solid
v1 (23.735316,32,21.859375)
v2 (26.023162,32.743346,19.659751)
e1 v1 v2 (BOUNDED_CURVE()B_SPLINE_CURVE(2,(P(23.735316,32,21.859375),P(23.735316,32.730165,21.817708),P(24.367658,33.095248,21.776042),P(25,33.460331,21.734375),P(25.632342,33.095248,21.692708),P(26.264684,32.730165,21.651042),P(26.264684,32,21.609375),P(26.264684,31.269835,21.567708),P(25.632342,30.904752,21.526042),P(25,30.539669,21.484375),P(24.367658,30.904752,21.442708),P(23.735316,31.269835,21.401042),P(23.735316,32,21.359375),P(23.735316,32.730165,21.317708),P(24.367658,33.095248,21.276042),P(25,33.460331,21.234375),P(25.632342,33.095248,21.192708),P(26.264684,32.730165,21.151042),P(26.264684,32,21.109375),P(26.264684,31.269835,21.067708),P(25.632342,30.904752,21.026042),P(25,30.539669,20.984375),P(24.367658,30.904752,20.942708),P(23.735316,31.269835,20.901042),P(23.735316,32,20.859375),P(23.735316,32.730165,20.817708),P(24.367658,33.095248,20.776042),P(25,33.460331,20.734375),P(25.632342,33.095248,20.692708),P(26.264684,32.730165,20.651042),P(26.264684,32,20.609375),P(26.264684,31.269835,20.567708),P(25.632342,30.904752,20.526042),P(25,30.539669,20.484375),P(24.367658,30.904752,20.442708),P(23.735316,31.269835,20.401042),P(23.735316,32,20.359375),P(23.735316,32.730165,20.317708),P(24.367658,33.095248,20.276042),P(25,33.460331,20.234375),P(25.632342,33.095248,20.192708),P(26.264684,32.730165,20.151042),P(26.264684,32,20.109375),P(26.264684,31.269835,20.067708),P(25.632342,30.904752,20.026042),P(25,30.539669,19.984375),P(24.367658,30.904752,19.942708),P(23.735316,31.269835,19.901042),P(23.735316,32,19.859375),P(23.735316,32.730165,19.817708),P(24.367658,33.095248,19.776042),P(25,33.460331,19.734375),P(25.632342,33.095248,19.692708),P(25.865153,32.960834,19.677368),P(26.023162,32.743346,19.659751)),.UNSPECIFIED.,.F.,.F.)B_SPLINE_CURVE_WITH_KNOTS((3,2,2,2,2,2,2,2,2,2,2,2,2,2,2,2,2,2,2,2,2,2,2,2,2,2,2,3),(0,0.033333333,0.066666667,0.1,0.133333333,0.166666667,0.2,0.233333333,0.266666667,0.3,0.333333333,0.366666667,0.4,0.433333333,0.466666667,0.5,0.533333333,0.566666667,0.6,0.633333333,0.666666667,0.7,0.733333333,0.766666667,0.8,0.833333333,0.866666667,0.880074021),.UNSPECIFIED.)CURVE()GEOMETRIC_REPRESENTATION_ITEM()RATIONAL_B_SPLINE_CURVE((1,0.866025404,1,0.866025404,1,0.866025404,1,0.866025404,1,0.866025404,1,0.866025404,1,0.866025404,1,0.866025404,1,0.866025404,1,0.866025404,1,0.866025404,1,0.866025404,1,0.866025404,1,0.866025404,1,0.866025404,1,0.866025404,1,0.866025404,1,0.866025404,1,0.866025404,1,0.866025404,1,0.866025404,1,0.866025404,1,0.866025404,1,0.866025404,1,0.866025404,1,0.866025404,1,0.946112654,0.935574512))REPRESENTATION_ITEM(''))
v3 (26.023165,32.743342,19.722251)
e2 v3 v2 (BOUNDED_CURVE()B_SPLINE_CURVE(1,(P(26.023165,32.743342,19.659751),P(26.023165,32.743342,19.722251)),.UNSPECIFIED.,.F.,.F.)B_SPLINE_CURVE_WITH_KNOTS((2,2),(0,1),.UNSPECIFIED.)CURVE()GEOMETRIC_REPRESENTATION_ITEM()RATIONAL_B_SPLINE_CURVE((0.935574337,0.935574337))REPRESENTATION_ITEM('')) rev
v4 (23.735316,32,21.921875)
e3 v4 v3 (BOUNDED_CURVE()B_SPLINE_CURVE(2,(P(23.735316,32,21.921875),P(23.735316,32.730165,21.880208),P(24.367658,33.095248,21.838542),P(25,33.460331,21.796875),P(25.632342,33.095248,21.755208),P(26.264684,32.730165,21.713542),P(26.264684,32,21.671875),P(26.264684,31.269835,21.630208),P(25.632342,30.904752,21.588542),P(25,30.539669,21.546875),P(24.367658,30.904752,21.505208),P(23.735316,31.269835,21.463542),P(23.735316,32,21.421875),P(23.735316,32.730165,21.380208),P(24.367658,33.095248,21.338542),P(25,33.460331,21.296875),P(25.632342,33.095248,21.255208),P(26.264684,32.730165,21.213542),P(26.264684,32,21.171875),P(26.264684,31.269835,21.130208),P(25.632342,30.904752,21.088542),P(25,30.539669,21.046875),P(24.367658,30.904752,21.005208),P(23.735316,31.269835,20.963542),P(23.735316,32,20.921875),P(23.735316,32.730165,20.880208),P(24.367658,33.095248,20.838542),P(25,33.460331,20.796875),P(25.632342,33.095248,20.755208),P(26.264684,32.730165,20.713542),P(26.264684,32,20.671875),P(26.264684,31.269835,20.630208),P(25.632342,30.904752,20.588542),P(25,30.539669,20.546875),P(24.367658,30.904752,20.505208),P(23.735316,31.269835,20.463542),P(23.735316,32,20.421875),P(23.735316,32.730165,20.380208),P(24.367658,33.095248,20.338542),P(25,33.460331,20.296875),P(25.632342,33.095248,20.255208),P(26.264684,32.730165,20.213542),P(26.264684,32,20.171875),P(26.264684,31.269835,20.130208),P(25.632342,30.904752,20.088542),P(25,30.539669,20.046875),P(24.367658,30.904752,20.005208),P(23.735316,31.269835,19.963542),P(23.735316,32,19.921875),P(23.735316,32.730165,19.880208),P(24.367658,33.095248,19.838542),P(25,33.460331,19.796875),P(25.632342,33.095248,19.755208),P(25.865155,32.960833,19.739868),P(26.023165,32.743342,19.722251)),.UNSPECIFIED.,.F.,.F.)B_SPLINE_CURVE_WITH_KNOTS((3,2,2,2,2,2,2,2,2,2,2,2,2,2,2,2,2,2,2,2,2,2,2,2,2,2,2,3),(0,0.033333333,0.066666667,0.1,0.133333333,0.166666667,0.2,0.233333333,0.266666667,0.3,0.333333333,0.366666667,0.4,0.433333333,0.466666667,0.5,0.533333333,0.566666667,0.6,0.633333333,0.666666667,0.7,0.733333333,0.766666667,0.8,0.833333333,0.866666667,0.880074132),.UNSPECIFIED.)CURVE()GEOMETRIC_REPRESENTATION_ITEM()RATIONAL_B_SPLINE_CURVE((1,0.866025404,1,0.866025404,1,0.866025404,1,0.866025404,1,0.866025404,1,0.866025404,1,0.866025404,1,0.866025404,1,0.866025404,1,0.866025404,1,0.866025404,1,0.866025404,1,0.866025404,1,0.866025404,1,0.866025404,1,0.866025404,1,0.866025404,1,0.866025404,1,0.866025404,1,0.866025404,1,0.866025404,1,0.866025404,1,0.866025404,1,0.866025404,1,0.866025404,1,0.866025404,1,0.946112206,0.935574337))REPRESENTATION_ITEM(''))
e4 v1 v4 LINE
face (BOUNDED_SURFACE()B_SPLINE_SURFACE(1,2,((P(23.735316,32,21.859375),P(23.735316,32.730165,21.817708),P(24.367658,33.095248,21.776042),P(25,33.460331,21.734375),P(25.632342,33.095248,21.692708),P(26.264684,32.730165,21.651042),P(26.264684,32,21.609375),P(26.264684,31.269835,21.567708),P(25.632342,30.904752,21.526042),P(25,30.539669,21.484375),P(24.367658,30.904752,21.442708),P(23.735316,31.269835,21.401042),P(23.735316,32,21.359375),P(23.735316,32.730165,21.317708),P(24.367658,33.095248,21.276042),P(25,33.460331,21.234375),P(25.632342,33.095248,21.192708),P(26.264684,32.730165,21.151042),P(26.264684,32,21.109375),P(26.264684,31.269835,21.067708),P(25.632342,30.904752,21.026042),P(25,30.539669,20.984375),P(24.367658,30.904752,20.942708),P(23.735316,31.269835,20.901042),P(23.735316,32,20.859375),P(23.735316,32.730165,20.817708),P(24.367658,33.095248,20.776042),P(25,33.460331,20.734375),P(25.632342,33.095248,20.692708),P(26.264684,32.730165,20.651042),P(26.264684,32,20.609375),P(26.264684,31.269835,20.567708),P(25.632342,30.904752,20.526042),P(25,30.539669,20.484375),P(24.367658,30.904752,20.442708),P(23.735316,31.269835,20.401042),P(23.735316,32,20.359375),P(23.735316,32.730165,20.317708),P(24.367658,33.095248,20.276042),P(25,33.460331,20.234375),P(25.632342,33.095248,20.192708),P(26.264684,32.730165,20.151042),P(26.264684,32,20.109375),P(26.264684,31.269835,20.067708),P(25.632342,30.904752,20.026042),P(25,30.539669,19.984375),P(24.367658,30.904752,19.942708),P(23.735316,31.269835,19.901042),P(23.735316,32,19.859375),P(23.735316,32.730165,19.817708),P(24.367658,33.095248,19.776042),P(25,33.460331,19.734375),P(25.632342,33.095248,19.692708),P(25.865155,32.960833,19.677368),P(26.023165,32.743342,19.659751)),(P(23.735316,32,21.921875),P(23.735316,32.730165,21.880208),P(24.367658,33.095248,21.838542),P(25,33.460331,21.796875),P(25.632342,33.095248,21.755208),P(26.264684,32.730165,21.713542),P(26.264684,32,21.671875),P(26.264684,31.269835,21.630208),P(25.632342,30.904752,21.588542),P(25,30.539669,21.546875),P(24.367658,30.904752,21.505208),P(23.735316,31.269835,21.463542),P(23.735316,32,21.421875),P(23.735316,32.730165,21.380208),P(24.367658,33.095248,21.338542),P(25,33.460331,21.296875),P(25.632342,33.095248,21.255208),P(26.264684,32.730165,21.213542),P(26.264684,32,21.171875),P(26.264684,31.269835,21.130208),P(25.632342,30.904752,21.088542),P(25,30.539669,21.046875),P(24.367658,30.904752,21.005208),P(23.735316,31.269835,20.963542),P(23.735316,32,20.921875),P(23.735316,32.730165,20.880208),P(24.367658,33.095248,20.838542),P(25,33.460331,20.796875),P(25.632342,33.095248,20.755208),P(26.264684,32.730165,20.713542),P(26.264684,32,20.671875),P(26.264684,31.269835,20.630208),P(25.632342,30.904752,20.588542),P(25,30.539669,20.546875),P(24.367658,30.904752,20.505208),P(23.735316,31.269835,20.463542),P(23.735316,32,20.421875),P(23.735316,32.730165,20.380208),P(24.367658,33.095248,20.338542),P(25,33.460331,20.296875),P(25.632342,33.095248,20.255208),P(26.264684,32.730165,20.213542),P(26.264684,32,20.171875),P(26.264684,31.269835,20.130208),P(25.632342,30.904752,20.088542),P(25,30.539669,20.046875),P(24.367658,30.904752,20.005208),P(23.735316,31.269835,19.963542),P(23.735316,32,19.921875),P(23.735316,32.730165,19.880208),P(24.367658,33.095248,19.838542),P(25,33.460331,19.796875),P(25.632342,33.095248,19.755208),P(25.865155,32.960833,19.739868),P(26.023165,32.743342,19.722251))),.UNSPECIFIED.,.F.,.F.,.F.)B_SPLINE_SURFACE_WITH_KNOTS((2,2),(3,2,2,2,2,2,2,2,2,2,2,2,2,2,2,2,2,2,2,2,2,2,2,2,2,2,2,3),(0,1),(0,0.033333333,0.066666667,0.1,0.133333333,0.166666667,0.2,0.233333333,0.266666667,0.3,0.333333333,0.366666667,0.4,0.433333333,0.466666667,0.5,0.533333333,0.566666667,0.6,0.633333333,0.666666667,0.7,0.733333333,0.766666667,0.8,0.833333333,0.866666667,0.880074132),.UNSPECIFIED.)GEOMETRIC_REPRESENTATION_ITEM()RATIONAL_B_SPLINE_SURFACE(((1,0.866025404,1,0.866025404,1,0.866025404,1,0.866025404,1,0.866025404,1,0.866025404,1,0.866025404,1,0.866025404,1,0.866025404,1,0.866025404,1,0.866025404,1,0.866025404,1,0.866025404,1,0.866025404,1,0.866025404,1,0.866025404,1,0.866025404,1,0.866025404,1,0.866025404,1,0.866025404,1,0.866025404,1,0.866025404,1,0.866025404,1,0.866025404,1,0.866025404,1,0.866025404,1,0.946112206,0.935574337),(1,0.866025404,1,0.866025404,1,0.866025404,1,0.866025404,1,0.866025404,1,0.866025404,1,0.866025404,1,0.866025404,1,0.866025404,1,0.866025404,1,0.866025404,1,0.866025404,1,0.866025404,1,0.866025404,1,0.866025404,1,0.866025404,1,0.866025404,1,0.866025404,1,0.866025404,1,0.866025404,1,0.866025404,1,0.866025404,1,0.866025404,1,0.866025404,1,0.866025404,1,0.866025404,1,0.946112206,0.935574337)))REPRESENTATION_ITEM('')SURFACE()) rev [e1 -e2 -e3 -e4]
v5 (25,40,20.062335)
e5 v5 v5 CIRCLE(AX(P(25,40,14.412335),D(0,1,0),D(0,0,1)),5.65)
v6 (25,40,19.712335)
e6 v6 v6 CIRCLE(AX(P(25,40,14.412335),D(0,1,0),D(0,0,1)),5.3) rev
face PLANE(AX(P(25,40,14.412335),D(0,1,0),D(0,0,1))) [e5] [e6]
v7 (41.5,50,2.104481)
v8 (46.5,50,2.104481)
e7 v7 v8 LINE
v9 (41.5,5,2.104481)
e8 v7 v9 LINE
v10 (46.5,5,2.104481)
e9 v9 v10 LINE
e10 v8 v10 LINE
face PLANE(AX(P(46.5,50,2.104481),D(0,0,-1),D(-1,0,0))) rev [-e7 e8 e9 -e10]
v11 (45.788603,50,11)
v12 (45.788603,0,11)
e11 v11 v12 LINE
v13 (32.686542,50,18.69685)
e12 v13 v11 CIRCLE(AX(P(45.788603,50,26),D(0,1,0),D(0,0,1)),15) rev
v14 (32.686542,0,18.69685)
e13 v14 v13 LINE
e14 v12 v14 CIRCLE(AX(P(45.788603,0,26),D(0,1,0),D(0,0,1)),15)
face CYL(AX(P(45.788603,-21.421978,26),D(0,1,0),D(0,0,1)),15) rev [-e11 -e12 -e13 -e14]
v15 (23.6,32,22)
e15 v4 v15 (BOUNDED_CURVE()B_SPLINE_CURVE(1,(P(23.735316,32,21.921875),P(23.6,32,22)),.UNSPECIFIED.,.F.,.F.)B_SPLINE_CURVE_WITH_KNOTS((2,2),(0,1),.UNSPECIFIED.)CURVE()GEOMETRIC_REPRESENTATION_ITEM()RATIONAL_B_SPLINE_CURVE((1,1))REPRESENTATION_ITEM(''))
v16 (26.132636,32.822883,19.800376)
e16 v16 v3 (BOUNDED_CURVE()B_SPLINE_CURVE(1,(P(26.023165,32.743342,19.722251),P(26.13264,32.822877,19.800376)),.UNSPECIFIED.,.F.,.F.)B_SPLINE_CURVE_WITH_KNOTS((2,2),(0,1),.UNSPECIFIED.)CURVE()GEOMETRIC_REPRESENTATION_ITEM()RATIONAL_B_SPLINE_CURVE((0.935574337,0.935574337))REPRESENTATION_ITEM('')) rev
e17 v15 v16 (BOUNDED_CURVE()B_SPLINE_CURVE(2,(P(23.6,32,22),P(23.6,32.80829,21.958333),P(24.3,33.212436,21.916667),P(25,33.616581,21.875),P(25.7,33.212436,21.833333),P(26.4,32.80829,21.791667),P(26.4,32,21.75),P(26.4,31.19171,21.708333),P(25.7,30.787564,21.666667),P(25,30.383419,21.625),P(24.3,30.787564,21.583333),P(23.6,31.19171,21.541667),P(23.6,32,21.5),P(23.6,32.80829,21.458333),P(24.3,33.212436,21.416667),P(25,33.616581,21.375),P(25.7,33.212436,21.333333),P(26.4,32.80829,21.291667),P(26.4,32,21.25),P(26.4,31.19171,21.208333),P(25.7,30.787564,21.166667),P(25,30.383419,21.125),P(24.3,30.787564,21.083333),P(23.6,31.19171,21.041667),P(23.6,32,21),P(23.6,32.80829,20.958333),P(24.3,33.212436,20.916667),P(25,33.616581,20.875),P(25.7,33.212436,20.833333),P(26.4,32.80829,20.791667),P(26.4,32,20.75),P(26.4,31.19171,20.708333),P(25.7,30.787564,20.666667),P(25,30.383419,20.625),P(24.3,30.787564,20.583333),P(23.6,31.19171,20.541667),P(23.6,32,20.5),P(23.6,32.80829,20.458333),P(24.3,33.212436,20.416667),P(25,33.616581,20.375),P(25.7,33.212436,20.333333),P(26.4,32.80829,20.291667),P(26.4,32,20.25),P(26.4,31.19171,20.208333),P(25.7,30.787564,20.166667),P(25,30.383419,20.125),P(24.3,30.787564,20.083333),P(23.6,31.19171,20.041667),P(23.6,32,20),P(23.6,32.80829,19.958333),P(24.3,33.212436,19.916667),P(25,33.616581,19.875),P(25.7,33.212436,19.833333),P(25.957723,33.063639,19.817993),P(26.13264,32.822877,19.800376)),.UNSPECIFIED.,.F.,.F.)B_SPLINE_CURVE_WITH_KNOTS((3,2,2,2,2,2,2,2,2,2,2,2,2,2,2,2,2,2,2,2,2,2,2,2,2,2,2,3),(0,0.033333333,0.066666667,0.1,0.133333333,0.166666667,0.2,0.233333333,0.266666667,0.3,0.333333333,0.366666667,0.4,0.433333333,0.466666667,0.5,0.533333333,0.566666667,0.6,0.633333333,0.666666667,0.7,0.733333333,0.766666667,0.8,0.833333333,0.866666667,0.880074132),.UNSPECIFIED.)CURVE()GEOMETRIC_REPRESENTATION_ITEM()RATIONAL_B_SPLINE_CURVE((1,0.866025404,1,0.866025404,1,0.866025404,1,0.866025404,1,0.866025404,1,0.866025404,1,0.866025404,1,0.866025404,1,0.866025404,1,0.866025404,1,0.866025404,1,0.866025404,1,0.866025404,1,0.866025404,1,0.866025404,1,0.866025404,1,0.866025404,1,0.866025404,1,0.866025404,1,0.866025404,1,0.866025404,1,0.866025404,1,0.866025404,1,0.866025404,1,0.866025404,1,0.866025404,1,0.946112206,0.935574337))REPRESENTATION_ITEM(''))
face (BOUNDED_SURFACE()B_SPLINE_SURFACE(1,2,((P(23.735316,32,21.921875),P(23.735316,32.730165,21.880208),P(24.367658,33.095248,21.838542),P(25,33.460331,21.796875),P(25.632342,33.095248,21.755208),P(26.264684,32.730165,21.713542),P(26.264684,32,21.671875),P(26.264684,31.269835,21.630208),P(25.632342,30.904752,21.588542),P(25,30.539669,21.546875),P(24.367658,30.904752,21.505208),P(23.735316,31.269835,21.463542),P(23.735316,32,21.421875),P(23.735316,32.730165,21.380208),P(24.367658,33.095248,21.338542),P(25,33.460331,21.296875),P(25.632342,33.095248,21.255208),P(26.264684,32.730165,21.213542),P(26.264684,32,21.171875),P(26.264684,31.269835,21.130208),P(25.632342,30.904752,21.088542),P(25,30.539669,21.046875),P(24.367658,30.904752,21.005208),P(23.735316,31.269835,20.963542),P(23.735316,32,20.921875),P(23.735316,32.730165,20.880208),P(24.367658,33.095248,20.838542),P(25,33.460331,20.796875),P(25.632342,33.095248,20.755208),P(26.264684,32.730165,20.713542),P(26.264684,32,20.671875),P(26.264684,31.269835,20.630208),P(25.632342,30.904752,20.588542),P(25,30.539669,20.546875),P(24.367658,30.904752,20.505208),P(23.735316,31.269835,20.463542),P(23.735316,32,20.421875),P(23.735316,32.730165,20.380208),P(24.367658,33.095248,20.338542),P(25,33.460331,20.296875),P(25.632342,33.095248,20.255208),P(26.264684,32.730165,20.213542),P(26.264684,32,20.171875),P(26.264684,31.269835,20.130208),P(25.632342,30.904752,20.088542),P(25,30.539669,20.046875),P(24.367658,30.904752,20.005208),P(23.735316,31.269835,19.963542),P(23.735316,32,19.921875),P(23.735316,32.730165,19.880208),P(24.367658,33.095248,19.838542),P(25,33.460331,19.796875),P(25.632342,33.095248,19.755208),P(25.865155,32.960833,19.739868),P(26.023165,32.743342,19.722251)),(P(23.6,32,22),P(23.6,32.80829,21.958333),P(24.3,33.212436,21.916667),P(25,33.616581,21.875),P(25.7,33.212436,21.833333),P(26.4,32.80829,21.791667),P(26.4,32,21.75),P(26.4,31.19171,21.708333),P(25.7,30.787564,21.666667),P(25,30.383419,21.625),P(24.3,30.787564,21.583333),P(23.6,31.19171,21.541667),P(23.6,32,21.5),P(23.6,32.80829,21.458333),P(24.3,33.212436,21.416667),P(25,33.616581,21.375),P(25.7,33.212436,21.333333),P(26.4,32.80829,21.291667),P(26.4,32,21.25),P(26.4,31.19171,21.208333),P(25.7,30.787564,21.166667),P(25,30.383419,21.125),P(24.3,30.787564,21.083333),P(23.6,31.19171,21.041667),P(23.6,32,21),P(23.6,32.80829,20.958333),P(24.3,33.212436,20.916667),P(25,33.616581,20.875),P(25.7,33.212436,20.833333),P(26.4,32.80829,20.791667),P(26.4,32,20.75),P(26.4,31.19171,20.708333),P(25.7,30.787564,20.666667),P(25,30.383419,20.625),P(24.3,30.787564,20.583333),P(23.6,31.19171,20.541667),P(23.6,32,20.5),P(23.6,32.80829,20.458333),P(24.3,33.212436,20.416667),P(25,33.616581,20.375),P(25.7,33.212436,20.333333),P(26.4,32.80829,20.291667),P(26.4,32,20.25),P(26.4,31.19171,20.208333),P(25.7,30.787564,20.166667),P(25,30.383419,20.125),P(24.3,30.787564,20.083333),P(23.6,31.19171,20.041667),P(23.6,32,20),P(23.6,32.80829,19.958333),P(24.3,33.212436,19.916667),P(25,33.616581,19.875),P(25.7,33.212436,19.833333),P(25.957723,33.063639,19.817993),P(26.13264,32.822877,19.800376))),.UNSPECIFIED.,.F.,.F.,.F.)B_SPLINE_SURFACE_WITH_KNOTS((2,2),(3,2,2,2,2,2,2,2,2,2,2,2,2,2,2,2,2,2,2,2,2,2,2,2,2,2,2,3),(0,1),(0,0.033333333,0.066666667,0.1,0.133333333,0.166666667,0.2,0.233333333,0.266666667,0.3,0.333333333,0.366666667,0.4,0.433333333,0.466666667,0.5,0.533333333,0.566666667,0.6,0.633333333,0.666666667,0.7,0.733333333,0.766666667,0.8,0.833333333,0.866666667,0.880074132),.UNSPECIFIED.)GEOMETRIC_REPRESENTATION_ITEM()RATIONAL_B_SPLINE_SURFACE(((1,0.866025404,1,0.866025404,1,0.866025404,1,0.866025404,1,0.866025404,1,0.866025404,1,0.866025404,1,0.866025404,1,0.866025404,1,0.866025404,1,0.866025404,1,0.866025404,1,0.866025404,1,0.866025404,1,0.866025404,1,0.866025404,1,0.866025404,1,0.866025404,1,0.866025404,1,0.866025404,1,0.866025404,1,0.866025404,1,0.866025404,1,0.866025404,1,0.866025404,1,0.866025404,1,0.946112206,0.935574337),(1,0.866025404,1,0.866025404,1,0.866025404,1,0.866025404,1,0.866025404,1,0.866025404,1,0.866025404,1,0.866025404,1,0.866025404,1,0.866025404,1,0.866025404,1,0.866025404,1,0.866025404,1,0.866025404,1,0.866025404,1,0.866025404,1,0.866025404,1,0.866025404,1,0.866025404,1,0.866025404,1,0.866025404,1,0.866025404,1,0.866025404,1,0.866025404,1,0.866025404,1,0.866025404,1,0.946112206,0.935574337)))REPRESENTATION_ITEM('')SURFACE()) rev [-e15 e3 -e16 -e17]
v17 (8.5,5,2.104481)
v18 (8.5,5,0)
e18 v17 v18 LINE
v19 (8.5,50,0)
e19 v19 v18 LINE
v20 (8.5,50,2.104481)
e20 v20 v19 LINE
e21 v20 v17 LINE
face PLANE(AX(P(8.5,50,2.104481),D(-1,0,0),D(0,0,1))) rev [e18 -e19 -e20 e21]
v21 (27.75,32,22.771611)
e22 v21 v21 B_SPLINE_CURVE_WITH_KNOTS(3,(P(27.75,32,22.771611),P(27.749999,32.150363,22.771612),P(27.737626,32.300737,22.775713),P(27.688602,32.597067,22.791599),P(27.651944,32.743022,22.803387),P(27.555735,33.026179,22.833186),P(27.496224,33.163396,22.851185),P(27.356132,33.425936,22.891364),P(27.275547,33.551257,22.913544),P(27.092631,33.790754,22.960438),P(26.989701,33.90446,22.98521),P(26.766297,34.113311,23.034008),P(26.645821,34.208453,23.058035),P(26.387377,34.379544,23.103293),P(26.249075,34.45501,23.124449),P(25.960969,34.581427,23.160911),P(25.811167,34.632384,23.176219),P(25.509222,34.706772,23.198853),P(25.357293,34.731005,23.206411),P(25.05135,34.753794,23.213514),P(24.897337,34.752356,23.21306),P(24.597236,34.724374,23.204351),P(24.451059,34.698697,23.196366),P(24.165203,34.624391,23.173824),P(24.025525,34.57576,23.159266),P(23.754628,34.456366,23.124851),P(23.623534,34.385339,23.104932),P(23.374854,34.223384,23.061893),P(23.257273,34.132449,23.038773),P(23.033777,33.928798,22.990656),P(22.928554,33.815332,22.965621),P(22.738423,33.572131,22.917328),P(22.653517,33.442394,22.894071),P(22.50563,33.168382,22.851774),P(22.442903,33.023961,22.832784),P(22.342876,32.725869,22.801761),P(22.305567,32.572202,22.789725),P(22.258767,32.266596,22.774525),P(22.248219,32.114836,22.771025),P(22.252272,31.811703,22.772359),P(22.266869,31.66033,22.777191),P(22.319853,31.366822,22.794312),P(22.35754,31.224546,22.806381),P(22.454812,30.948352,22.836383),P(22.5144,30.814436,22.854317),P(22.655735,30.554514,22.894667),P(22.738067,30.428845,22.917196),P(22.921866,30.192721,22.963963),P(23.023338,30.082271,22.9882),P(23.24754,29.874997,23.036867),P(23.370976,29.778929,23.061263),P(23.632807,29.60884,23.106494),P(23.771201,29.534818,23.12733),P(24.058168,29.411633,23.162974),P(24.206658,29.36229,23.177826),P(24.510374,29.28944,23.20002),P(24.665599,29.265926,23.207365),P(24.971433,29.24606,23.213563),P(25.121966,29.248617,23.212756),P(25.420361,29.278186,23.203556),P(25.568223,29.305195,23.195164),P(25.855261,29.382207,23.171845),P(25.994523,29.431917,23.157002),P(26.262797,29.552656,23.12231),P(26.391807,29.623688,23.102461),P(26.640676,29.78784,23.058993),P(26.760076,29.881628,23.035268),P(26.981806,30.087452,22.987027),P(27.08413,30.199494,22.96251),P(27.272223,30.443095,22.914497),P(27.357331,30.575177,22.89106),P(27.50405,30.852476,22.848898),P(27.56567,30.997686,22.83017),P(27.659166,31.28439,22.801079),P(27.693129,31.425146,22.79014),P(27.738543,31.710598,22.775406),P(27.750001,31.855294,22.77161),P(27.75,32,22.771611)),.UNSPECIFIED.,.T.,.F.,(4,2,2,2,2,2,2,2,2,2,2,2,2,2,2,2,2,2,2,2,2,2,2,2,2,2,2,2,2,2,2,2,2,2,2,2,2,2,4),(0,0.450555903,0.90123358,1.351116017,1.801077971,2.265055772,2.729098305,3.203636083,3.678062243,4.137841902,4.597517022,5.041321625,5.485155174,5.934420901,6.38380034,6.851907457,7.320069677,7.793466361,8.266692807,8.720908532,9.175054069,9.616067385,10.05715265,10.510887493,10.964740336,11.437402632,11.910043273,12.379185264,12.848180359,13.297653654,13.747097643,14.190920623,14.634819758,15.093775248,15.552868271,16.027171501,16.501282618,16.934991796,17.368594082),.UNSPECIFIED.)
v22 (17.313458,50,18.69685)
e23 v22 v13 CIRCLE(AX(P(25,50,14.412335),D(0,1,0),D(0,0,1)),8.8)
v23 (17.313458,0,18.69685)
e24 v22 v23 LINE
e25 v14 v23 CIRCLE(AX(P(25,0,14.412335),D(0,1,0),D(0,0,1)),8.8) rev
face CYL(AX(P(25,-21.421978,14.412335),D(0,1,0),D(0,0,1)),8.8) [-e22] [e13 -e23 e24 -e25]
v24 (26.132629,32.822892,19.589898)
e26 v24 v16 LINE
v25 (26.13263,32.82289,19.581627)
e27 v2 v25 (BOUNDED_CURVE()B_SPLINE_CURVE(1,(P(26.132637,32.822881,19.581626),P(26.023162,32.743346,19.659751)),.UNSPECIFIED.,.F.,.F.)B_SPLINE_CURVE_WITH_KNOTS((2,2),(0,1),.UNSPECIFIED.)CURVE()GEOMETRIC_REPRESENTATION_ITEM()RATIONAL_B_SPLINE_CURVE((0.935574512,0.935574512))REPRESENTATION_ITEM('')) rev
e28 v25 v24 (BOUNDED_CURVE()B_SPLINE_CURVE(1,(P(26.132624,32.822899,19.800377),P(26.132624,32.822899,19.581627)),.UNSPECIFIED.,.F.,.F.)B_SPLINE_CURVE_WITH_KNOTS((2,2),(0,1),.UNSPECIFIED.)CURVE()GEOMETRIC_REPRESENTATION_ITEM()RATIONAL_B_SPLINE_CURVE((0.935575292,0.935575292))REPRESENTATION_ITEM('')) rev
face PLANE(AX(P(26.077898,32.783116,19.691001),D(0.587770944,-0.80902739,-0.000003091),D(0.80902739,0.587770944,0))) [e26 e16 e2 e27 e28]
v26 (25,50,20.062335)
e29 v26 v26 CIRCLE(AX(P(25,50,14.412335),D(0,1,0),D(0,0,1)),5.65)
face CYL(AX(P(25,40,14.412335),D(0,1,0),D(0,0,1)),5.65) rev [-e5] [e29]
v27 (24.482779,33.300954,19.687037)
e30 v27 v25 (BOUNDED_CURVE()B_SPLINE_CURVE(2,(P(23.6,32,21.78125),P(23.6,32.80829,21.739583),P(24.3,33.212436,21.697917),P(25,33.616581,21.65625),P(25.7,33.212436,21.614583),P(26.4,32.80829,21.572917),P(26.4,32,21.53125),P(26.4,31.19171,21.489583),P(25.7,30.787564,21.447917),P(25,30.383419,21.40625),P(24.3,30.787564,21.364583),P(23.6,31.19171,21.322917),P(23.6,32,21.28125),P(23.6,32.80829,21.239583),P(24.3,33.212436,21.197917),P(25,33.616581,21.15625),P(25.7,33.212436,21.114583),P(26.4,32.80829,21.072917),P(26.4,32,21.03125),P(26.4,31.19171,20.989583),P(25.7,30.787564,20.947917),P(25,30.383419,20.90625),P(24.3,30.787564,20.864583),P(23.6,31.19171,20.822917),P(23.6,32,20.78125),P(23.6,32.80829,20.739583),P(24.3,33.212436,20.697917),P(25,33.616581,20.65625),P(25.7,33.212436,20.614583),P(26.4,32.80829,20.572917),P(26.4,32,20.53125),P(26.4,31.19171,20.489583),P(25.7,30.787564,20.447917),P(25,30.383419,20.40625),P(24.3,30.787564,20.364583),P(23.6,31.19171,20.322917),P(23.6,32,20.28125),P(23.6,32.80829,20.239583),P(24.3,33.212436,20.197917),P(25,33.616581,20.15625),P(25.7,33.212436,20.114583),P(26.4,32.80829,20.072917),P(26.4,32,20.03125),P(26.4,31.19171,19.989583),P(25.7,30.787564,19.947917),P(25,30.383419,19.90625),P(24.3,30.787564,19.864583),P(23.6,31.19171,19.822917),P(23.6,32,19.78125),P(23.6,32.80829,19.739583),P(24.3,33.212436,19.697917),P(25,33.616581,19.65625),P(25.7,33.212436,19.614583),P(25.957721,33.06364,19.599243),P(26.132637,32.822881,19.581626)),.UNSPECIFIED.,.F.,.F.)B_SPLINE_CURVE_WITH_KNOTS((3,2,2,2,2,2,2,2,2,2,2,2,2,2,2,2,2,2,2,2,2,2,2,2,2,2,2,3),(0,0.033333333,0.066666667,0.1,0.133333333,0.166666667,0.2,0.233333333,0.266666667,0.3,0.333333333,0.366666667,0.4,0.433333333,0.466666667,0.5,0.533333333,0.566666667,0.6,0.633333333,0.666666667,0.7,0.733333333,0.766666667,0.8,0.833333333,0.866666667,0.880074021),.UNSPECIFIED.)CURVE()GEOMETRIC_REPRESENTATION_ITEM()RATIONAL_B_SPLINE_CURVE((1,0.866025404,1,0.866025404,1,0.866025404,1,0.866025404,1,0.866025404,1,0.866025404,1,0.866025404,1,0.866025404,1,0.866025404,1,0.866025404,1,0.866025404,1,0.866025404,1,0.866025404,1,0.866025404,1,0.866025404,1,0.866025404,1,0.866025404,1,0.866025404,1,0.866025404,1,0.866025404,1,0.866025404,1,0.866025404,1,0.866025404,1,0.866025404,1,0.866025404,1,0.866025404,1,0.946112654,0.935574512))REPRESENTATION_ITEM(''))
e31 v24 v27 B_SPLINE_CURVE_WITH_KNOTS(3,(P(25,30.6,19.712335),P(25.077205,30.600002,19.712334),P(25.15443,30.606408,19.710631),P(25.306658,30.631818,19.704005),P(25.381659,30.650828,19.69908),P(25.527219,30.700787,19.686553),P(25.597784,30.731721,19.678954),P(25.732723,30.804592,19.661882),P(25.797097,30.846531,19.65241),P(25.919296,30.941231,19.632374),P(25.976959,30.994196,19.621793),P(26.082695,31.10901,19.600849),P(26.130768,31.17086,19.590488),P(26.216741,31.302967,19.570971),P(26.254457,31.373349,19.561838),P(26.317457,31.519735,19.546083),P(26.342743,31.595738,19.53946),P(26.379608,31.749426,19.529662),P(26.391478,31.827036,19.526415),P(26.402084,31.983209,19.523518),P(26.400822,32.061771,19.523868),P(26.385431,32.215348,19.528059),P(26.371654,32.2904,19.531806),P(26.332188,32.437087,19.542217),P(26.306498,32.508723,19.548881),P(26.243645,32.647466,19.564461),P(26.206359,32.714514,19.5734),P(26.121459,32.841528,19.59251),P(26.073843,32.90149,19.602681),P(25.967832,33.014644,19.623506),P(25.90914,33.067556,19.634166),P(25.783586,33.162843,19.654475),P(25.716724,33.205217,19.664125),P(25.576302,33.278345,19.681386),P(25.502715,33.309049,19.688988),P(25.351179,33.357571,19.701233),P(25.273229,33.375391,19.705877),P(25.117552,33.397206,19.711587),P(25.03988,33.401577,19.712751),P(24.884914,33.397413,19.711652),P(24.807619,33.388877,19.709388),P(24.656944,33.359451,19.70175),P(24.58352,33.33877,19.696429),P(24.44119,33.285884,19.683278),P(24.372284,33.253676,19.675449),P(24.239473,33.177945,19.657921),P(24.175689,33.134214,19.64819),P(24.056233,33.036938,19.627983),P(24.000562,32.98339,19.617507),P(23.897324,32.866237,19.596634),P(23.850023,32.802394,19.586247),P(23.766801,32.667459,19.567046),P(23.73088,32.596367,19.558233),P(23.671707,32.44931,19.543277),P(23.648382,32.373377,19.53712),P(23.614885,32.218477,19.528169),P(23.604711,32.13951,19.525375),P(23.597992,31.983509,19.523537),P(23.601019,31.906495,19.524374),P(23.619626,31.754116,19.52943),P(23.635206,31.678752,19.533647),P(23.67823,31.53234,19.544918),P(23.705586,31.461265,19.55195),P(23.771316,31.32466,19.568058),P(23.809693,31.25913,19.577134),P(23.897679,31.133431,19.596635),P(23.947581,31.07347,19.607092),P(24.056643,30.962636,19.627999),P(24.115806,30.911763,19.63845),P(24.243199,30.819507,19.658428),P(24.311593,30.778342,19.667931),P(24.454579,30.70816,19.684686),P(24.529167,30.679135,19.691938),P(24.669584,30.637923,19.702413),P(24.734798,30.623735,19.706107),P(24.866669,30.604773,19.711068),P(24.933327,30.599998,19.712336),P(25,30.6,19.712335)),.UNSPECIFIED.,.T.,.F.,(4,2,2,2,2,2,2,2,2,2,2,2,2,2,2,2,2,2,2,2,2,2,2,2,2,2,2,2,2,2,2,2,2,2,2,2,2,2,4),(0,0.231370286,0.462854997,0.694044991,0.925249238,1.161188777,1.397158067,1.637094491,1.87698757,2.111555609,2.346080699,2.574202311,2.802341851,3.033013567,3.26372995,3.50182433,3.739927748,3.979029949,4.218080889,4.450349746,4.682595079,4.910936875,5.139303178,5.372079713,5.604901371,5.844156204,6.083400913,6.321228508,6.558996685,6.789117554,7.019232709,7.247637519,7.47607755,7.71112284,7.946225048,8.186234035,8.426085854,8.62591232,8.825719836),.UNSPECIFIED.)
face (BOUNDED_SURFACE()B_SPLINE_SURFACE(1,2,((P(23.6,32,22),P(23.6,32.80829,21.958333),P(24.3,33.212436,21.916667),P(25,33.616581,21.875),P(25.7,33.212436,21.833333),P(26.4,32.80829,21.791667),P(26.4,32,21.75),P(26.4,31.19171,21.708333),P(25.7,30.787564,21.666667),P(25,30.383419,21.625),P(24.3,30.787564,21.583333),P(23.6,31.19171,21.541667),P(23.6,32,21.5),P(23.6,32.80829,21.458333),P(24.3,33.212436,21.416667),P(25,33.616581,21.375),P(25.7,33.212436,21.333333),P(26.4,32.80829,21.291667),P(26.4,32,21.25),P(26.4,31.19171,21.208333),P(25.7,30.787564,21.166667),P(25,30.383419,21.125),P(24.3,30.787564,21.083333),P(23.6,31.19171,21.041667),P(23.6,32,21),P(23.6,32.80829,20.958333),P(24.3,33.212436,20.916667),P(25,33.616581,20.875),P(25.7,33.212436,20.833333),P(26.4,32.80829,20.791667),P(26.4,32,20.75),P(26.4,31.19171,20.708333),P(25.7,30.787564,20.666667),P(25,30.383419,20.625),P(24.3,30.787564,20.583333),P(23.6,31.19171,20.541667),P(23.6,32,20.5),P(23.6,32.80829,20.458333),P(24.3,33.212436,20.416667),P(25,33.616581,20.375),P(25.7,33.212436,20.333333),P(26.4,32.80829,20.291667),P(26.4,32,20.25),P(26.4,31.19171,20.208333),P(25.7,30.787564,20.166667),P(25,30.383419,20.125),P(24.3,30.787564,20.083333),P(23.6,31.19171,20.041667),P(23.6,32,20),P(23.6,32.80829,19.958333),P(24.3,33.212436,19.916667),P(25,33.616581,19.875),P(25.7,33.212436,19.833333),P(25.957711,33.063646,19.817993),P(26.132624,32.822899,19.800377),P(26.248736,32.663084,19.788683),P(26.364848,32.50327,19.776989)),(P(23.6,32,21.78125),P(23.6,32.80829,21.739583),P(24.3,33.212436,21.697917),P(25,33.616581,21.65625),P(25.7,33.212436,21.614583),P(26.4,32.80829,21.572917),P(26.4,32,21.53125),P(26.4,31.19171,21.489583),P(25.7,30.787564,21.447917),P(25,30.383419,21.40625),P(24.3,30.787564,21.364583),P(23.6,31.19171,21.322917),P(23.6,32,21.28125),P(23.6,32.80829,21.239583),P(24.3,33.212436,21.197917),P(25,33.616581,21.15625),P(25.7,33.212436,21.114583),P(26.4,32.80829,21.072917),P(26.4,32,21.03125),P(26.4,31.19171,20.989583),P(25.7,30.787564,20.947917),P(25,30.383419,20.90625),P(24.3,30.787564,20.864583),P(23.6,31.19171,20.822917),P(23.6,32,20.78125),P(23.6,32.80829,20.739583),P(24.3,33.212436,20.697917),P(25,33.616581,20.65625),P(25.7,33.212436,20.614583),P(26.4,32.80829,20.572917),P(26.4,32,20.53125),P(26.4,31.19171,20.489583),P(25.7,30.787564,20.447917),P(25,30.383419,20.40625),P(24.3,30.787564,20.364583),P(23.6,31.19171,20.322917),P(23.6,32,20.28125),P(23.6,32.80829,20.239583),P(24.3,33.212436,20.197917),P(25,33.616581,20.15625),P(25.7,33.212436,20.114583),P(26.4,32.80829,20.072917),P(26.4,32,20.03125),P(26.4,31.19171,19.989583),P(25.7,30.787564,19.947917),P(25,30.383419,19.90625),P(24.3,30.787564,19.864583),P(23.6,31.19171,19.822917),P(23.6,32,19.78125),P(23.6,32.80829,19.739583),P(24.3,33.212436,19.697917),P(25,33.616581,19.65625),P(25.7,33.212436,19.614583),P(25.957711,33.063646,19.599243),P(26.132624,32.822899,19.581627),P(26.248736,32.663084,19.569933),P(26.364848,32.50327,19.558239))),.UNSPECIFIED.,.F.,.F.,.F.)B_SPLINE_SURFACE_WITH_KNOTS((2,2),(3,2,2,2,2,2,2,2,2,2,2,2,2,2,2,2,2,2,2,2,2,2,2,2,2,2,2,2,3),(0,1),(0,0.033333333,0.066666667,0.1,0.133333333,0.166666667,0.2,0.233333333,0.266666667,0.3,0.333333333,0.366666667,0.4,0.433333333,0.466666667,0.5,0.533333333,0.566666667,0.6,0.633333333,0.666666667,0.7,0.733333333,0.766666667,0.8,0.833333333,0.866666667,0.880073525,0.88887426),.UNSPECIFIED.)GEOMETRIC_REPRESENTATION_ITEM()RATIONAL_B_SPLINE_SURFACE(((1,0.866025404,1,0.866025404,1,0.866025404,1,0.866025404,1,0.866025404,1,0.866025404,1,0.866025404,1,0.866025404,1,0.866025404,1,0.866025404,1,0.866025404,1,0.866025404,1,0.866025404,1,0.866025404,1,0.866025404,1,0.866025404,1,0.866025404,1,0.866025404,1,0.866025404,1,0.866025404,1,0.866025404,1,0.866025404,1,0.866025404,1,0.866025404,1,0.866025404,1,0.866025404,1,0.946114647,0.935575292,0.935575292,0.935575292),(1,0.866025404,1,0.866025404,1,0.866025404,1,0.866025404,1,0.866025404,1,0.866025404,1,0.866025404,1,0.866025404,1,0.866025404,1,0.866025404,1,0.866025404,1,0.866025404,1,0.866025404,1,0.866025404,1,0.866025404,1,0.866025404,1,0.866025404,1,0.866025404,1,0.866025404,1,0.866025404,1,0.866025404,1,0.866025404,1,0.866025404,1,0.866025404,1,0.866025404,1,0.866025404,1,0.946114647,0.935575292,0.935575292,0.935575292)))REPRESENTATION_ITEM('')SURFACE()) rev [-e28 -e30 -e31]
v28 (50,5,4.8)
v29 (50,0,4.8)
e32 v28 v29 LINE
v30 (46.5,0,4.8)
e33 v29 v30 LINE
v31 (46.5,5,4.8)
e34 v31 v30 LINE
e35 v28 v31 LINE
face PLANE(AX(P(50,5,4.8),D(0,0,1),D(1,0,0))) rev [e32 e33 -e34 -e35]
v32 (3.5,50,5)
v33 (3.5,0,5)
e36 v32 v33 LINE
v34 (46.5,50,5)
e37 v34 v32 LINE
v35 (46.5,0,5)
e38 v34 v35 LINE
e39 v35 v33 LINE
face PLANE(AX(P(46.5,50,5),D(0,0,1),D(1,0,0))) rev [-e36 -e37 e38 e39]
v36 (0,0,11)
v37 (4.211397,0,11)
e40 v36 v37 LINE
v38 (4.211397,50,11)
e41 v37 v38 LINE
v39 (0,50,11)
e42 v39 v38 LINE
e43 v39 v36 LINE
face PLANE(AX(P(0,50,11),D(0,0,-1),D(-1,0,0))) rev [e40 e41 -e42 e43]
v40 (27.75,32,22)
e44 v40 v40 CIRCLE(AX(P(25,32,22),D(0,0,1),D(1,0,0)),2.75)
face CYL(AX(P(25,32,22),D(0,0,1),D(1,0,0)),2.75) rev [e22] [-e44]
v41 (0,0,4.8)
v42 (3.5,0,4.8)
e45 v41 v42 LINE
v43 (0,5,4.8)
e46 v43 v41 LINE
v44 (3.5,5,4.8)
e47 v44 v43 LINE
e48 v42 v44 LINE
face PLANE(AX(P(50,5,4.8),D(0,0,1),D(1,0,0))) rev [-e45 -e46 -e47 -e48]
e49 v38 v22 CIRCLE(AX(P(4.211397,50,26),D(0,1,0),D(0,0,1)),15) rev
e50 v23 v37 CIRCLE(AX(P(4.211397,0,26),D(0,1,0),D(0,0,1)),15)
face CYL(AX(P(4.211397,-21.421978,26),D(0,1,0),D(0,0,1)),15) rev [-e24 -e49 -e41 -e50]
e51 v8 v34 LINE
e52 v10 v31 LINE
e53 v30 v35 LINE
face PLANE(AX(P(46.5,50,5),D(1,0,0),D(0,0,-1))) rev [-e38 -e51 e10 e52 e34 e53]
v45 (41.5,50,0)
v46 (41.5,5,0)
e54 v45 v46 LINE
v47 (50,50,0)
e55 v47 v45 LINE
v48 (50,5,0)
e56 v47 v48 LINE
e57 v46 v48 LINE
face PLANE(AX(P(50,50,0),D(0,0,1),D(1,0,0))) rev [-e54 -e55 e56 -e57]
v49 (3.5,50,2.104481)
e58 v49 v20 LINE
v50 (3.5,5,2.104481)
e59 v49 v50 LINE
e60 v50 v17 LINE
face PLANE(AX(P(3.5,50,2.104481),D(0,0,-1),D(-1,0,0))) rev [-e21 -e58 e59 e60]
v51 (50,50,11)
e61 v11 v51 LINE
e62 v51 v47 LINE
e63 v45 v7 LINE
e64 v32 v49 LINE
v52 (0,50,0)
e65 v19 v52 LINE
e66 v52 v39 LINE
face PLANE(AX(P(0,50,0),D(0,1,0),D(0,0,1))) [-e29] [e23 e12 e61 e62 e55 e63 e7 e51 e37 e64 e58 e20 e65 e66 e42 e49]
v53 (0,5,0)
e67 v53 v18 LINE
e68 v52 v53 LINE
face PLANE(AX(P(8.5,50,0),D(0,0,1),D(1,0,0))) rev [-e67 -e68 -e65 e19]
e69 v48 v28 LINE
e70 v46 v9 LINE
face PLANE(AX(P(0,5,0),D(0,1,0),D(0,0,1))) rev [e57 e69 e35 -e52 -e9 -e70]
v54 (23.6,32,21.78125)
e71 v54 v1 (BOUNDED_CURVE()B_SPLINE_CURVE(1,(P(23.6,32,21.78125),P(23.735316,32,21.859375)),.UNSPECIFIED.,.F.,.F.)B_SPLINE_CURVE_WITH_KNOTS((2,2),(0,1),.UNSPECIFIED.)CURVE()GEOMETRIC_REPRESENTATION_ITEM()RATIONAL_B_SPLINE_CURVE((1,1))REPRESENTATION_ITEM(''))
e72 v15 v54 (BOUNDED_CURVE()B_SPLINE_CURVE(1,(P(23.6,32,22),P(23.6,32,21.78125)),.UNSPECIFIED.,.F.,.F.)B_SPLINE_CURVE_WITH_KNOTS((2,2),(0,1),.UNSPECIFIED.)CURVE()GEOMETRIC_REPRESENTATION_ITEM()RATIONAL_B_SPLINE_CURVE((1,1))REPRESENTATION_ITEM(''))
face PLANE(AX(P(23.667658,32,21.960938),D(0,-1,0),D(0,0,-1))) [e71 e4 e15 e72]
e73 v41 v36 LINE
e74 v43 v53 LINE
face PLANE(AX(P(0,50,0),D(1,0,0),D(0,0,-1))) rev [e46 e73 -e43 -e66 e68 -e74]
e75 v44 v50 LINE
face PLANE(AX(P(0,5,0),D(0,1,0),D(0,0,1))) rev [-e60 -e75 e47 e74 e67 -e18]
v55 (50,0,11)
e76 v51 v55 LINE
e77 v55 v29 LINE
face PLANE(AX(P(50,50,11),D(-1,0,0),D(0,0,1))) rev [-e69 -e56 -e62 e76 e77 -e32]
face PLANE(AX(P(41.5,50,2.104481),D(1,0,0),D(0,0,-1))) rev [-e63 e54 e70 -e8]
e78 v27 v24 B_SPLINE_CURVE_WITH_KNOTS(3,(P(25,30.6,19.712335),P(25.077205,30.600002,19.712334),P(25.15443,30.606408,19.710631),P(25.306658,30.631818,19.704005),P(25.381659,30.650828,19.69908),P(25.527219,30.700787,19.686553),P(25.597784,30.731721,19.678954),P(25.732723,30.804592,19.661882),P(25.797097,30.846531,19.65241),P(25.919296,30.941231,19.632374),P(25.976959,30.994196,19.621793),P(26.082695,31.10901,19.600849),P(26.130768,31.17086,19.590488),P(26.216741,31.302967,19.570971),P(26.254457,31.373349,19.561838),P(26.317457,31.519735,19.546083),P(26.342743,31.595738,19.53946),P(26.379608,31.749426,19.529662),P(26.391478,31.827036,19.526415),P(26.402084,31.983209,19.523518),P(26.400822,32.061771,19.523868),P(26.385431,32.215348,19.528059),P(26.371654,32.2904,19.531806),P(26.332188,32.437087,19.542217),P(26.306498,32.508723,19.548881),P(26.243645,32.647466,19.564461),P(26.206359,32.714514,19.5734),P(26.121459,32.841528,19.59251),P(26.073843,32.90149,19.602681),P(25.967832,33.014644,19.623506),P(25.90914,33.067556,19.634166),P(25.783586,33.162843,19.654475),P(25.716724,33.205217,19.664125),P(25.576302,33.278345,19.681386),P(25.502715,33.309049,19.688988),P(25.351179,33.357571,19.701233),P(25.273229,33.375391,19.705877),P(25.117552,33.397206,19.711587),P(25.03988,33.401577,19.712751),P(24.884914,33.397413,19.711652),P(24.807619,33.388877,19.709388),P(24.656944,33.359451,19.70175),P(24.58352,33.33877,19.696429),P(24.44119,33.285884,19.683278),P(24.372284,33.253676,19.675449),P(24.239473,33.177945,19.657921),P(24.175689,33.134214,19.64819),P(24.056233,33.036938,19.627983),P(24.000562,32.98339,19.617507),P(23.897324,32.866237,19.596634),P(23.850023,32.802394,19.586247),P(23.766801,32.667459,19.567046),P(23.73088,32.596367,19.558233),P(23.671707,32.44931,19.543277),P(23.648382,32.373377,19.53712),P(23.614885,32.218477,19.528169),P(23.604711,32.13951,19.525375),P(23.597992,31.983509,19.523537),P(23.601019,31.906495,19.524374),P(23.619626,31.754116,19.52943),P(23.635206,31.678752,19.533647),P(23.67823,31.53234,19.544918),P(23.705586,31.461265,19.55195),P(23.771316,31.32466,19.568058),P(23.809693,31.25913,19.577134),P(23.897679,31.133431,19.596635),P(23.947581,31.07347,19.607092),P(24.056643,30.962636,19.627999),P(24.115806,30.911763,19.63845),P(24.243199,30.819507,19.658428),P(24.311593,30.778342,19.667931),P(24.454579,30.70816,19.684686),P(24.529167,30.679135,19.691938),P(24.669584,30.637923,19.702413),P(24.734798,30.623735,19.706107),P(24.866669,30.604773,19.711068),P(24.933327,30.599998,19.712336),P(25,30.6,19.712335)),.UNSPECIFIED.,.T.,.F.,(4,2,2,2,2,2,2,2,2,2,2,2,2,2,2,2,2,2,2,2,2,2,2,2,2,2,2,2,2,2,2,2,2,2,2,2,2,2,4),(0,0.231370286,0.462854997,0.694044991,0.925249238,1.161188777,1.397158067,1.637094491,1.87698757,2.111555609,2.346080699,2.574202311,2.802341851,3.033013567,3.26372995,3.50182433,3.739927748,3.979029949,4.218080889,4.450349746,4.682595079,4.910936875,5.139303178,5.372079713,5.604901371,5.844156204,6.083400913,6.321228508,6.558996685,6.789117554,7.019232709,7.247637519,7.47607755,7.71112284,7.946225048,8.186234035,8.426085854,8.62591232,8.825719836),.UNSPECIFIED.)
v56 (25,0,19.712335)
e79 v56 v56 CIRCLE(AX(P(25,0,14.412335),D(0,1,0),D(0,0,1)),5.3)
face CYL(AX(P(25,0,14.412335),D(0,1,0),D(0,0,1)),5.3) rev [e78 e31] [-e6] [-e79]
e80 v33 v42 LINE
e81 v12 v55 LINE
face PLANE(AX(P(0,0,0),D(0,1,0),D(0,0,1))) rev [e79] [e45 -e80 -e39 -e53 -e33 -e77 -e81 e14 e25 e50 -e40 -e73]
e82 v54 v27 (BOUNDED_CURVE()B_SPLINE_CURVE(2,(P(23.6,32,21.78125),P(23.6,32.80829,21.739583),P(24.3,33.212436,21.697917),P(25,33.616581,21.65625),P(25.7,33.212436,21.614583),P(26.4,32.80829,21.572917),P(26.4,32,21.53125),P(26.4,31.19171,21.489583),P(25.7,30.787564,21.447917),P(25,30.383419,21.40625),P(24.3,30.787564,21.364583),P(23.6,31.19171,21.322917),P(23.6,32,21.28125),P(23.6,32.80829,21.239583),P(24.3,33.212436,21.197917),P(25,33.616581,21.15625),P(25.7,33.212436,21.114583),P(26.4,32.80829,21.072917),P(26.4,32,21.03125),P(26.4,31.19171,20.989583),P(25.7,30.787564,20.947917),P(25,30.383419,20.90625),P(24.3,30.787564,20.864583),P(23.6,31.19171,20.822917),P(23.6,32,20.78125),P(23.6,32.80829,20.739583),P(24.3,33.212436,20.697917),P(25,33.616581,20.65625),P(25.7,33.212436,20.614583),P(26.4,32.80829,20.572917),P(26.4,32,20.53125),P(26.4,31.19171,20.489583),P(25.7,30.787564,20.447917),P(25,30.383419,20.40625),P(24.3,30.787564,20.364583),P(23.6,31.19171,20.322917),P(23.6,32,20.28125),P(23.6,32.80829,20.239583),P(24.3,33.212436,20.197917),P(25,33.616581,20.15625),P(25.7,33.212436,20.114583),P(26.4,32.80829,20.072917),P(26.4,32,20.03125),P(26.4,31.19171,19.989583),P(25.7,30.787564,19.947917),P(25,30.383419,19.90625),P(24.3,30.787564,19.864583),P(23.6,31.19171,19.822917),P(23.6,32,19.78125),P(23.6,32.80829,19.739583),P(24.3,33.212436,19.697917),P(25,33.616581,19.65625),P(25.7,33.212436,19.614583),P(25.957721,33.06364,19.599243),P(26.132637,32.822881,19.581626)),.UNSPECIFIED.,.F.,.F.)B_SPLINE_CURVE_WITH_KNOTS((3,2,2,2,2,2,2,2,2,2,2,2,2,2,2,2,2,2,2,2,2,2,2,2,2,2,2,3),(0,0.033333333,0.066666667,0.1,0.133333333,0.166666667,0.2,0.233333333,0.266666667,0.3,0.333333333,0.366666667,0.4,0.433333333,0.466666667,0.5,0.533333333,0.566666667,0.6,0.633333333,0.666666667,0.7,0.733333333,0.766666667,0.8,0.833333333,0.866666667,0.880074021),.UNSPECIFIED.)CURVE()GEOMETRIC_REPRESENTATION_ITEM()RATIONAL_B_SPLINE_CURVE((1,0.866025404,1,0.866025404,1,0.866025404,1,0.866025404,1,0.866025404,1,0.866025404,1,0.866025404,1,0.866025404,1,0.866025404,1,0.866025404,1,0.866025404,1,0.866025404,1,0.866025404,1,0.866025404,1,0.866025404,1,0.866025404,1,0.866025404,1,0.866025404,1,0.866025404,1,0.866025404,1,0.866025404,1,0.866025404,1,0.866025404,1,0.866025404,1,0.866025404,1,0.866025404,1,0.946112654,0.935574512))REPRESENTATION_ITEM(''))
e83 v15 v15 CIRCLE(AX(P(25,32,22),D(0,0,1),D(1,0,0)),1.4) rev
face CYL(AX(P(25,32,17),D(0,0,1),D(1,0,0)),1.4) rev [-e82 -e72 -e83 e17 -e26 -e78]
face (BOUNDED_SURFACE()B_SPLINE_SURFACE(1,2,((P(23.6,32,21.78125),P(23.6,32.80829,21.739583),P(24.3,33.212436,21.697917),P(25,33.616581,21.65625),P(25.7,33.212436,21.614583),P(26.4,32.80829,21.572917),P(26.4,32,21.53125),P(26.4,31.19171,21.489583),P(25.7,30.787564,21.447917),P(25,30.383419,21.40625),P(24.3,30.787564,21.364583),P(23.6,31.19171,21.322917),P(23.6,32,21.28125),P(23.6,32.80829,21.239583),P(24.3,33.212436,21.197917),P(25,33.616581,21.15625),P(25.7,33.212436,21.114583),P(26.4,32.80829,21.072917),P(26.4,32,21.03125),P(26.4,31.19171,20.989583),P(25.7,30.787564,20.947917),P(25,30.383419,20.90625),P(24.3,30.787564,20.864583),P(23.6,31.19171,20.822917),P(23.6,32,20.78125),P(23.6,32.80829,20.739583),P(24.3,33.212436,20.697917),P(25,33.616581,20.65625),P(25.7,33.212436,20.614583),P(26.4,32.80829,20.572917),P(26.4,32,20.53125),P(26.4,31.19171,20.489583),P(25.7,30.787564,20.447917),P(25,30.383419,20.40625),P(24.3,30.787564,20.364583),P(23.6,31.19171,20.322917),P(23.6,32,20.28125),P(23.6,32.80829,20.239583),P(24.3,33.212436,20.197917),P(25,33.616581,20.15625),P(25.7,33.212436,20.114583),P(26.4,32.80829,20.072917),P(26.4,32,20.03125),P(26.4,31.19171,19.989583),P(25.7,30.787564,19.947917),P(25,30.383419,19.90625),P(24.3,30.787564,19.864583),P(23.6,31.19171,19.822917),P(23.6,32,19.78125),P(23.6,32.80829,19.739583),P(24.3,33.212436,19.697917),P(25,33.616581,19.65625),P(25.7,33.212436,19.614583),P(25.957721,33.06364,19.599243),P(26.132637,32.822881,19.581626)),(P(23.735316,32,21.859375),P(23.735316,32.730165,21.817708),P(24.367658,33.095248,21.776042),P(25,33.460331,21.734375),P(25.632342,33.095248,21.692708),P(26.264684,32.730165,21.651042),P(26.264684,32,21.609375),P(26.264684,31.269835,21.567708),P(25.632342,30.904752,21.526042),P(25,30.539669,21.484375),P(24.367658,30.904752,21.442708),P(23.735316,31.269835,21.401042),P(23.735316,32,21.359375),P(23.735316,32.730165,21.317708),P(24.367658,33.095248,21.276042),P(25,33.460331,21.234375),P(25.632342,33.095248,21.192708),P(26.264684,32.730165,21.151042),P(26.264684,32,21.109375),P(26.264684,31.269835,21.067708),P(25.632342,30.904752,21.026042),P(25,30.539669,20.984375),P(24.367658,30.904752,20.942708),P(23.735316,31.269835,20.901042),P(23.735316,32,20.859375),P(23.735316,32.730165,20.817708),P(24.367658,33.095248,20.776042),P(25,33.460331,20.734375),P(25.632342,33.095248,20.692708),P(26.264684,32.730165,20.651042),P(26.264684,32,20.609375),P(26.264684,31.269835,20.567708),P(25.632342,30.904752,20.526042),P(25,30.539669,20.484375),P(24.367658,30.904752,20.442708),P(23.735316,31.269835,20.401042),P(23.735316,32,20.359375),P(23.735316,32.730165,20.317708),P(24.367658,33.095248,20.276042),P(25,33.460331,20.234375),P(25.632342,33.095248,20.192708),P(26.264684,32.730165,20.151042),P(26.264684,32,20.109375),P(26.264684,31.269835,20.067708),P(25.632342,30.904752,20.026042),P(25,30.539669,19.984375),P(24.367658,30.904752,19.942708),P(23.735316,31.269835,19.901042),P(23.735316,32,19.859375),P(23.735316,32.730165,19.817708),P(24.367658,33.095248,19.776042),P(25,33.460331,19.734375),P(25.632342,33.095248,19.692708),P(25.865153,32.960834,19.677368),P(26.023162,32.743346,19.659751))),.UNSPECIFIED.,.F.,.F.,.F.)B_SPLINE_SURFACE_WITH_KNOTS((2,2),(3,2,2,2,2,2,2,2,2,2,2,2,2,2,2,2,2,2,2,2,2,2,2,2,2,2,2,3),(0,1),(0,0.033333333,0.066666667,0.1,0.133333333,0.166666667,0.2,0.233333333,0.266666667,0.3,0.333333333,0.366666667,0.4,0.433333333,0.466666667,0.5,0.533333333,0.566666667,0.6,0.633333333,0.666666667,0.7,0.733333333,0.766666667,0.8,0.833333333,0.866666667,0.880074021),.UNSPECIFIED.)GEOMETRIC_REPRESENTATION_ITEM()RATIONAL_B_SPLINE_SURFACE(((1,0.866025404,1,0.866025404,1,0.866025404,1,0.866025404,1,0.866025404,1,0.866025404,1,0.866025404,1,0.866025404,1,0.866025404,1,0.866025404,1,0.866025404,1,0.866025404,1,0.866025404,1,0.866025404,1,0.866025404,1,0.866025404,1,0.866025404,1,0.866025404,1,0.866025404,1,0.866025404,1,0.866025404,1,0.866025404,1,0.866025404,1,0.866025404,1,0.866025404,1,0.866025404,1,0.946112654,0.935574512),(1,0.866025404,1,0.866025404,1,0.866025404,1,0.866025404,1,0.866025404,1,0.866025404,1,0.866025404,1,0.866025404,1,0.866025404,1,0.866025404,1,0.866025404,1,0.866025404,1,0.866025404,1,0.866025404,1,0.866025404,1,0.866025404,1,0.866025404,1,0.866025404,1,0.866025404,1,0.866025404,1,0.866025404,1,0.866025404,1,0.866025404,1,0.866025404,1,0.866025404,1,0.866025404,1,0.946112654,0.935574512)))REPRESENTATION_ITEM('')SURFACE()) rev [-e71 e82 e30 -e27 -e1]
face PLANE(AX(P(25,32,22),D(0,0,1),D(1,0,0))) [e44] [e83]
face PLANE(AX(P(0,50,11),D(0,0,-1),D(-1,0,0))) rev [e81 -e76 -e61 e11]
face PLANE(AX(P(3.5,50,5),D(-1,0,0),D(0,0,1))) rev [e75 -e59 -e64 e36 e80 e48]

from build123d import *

# Parameters (mm, degrees)
BOSS_EXTRUDE1_DEPTH = 50
SKETCH2_W           = 50
SKETCH2_H           = 4.8
CUT_EXTRUDE1_DEPTH  = 5
SKETCH3_R           = 5.3
CUT_EXTRUDE2_DEPTH  = 72.561162651
BOSS_EXTRUDE2_DEPTH = 50
FILLET1_R           = 15
SKETCH6_R           = 1.4
CUT_EXTRUDE4_DEPTH  = 10
SKETCH7_R           = 2.75
CUT_EXTRUDE5_DEPTH  = 5
THREAD1_PITCH       = 0.5
SKETCH9_R           = 5.65
CUT_EXTRUDE6_DEPTH  = 10


with BuildPart() as part:
    # Sketch1 → Boss-Extrude1 (new body)
    with BuildSketch(Plane(origin=(0, 0, 0), x_dir=(1, 0, 0), z_dir=(0, 1, 0))):
        Polygon((8.5, 0), (0, 0), (0, -11), (50, -11), (50, 0), (41.5, 0), (41.5, -2.104480912), (46.5, -2.104480912), (46.5, -5), (3.5, -5), (3.5, -2.104480912), (8.5, -2.104480912), align=None)
    extrude(amount=BOSS_EXTRUDE1_DEPTH)

    # Sketch2 → Cut-Extrude1 (cut)
    with BuildSketch(Plane.XZ):
        with Locations((25, 2.4)):
            Rectangle(SKETCH2_W, SKETCH2_H)
    extrude(amount=-CUT_EXTRUDE1_DEPTH, mode=Mode.SUBTRACT)

    # Sketch3 → Cut-Extrude2 (cut, through all)
    with BuildSketch(Plane(origin=(0, 50, 0), x_dir=(1, 0, 0), z_dir=(0, 1, 0))):
        with Locations((25, -14.412334908)):
            Circle(SKETCH3_R)
    extrude(amount=-CUT_EXTRUDE2_DEPTH, mode=Mode.SUBTRACT)

    # Sketch5 → Boss-Extrude2 (add)
    with BuildSketch(Plane(origin=(0, 50, 0), x_dir=(1, 0, 0), z_dir=(0, 1, 0))):
        with BuildLine():
            Line((16.888528464, -11), (20.944636826, -11))
            ThreePointArc((20.944636826, -11), (25, -19.712334908), (29.055363174, -11))
            Line((29.055363174, -11), (33.111471536, -11))
            ThreePointArc((33.111471536, -11), (25, -23.212334908), (16.888528464, -11))
        make_face()
    extrude(amount=-BOSS_EXTRUDE2_DEPTH)

    # Fillet1
    fillet1_edges = [part.edges().sort_by_distance(p)[0] for p in [
        (33.111471536, 25, 11),
        (16.888528464, 25, 11),
    ]]
    fillet(fillet1_edges, radius=FILLET1_R)

    # Sketch6 → Cut-Extrude4 (cut)
    with BuildSketch(Plane.XY.offset(27)):
        with Locations((25, 32)):
            Circle(SKETCH6_R)
    extrude(amount=-CUT_EXTRUDE4_DEPTH, mode=Mode.SUBTRACT)

    # Sketch7 → Cut-Extrude5 (cut)
    with BuildSketch(Plane.XY.offset(27)):
        with Locations((25, 32)):
            Circle(SKETCH7_R)
    extrude(amount=-CUT_EXTRUDE5_DEPTH, mode=Mode.SUBTRACT)

    # Thread1: the profile of Thread Profile1 profile screwed along a right-hand helix of 4.4 turns, 6 arcs to a turn; built about Z, then put on its axis
    thread1_z = Axis((0, 0, 0), (0, 0, 1))
    thread1_corners = [(1.4003, 0, -0.000173205), (1.4003, 0, 0.218923204), (1.264683531, 0, 0.140625), (1.264683531, 0, 0.078125)]
    with BuildLine(mode=Mode.PRIVATE) as thread1_profile:
        Line(thread1_corners[0], thread1_corners[1])
        Line(thread1_corners[1], thread1_corners[2])
        Line(thread1_corners[2], thread1_corners[3])
        Line(thread1_corners[3], thread1_corners[0])
    thread1_cap = Face(thread1_profile.wire())
    thread1_turn_angles = [0, 30, 60, 90, 120, 150, 180, 210, 240, 270, 300, 330, 360]
    thread1_turn_weights = [1, 0.8660254037844387, 1, 0.8660254037844387, 1, 0.8660254037844387, 1, 0.8660254037844387, 1, 0.8660254037844387, 1, 0.8660254037844387, 1]
    thread1_turn_rails = [Edge.make_bspline([Vector(p[0], p[1], 0).rotate(thread1_z, thread1_turn_angles[k]) / thread1_turn_weights[k] + Vector(0, 0, p[2] + THREAD1_PITCH * thread1_turn_angles[k] / 360) for k in range(13)], [0, 0, 0, 1, 1, 2, 2, 3, 3, 4, 4, 5, 5, 6, 6, 6], 2, thread1_turn_weights) for p in thread1_corners]
    thread1_turn_sides = [Face.make_surface_from_curves(thread1_turn_rails[p[0]], thread1_turn_rails[p[1]]) for p in [(0, 1), (1, 2), (2, 3), (3, 0)]]
    thread1_last_angles = [1440, 1470, 1500, 1530, 1560, 1572, 1584]
    thread1_last_weights = [1, 0.8660254037844387, 1, 0.8660254037844387, 1, 0.9781476007338052, 1]
    thread1_last_rails = [Edge.make_bspline([Vector(p[0], p[1], 0).rotate(thread1_z, thread1_last_angles[k]) / thread1_last_weights[k] + Vector(0, 0, p[2] + THREAD1_PITCH * thread1_last_angles[k] / 360) for k in range(7)], [0, 0, 0, 1, 1, 2, 2, 3, 3, 3], 2, thread1_last_weights) for p in thread1_corners]
    thread1_last_sides = [Face.make_surface_from_curves(thread1_last_rails[p[0]], thread1_last_rails[p[1]]) for p in [(0, 1), (1, 2), (2, 3), (3, 0)]]
    thread1 = Plane(origin=(25, 32, 22), x_dir=(-1, 0, 0), z_dir=(0, 0, -1)) * Solid(Shell([*[p.moved(Location((0, 0, THREAD1_PITCH * i))) for i in range(4) for p in thread1_turn_sides], *thread1_last_sides, thread1_cap, thread1_cap.rotate(thread1_z, 1584).moved(Location((0, 0, THREAD1_PITCH * 1584 / 360)))]))
    add(thread1)

    # Sketch9 → Cut-Extrude6 (cut)
    with BuildSketch(Plane(origin=(0, 50, 0), x_dir=(1, 0, 0), z_dir=(0, 1, 0))):
        with Locations(Location((25, -14.412334908, 0), (0, 0, 270))):
            Circle(SKETCH9_R)
    extrude(amount=-CUT_EXTRUDE6_DEPTH, mode=Mode.SUBTRACT)


solid = part.part
